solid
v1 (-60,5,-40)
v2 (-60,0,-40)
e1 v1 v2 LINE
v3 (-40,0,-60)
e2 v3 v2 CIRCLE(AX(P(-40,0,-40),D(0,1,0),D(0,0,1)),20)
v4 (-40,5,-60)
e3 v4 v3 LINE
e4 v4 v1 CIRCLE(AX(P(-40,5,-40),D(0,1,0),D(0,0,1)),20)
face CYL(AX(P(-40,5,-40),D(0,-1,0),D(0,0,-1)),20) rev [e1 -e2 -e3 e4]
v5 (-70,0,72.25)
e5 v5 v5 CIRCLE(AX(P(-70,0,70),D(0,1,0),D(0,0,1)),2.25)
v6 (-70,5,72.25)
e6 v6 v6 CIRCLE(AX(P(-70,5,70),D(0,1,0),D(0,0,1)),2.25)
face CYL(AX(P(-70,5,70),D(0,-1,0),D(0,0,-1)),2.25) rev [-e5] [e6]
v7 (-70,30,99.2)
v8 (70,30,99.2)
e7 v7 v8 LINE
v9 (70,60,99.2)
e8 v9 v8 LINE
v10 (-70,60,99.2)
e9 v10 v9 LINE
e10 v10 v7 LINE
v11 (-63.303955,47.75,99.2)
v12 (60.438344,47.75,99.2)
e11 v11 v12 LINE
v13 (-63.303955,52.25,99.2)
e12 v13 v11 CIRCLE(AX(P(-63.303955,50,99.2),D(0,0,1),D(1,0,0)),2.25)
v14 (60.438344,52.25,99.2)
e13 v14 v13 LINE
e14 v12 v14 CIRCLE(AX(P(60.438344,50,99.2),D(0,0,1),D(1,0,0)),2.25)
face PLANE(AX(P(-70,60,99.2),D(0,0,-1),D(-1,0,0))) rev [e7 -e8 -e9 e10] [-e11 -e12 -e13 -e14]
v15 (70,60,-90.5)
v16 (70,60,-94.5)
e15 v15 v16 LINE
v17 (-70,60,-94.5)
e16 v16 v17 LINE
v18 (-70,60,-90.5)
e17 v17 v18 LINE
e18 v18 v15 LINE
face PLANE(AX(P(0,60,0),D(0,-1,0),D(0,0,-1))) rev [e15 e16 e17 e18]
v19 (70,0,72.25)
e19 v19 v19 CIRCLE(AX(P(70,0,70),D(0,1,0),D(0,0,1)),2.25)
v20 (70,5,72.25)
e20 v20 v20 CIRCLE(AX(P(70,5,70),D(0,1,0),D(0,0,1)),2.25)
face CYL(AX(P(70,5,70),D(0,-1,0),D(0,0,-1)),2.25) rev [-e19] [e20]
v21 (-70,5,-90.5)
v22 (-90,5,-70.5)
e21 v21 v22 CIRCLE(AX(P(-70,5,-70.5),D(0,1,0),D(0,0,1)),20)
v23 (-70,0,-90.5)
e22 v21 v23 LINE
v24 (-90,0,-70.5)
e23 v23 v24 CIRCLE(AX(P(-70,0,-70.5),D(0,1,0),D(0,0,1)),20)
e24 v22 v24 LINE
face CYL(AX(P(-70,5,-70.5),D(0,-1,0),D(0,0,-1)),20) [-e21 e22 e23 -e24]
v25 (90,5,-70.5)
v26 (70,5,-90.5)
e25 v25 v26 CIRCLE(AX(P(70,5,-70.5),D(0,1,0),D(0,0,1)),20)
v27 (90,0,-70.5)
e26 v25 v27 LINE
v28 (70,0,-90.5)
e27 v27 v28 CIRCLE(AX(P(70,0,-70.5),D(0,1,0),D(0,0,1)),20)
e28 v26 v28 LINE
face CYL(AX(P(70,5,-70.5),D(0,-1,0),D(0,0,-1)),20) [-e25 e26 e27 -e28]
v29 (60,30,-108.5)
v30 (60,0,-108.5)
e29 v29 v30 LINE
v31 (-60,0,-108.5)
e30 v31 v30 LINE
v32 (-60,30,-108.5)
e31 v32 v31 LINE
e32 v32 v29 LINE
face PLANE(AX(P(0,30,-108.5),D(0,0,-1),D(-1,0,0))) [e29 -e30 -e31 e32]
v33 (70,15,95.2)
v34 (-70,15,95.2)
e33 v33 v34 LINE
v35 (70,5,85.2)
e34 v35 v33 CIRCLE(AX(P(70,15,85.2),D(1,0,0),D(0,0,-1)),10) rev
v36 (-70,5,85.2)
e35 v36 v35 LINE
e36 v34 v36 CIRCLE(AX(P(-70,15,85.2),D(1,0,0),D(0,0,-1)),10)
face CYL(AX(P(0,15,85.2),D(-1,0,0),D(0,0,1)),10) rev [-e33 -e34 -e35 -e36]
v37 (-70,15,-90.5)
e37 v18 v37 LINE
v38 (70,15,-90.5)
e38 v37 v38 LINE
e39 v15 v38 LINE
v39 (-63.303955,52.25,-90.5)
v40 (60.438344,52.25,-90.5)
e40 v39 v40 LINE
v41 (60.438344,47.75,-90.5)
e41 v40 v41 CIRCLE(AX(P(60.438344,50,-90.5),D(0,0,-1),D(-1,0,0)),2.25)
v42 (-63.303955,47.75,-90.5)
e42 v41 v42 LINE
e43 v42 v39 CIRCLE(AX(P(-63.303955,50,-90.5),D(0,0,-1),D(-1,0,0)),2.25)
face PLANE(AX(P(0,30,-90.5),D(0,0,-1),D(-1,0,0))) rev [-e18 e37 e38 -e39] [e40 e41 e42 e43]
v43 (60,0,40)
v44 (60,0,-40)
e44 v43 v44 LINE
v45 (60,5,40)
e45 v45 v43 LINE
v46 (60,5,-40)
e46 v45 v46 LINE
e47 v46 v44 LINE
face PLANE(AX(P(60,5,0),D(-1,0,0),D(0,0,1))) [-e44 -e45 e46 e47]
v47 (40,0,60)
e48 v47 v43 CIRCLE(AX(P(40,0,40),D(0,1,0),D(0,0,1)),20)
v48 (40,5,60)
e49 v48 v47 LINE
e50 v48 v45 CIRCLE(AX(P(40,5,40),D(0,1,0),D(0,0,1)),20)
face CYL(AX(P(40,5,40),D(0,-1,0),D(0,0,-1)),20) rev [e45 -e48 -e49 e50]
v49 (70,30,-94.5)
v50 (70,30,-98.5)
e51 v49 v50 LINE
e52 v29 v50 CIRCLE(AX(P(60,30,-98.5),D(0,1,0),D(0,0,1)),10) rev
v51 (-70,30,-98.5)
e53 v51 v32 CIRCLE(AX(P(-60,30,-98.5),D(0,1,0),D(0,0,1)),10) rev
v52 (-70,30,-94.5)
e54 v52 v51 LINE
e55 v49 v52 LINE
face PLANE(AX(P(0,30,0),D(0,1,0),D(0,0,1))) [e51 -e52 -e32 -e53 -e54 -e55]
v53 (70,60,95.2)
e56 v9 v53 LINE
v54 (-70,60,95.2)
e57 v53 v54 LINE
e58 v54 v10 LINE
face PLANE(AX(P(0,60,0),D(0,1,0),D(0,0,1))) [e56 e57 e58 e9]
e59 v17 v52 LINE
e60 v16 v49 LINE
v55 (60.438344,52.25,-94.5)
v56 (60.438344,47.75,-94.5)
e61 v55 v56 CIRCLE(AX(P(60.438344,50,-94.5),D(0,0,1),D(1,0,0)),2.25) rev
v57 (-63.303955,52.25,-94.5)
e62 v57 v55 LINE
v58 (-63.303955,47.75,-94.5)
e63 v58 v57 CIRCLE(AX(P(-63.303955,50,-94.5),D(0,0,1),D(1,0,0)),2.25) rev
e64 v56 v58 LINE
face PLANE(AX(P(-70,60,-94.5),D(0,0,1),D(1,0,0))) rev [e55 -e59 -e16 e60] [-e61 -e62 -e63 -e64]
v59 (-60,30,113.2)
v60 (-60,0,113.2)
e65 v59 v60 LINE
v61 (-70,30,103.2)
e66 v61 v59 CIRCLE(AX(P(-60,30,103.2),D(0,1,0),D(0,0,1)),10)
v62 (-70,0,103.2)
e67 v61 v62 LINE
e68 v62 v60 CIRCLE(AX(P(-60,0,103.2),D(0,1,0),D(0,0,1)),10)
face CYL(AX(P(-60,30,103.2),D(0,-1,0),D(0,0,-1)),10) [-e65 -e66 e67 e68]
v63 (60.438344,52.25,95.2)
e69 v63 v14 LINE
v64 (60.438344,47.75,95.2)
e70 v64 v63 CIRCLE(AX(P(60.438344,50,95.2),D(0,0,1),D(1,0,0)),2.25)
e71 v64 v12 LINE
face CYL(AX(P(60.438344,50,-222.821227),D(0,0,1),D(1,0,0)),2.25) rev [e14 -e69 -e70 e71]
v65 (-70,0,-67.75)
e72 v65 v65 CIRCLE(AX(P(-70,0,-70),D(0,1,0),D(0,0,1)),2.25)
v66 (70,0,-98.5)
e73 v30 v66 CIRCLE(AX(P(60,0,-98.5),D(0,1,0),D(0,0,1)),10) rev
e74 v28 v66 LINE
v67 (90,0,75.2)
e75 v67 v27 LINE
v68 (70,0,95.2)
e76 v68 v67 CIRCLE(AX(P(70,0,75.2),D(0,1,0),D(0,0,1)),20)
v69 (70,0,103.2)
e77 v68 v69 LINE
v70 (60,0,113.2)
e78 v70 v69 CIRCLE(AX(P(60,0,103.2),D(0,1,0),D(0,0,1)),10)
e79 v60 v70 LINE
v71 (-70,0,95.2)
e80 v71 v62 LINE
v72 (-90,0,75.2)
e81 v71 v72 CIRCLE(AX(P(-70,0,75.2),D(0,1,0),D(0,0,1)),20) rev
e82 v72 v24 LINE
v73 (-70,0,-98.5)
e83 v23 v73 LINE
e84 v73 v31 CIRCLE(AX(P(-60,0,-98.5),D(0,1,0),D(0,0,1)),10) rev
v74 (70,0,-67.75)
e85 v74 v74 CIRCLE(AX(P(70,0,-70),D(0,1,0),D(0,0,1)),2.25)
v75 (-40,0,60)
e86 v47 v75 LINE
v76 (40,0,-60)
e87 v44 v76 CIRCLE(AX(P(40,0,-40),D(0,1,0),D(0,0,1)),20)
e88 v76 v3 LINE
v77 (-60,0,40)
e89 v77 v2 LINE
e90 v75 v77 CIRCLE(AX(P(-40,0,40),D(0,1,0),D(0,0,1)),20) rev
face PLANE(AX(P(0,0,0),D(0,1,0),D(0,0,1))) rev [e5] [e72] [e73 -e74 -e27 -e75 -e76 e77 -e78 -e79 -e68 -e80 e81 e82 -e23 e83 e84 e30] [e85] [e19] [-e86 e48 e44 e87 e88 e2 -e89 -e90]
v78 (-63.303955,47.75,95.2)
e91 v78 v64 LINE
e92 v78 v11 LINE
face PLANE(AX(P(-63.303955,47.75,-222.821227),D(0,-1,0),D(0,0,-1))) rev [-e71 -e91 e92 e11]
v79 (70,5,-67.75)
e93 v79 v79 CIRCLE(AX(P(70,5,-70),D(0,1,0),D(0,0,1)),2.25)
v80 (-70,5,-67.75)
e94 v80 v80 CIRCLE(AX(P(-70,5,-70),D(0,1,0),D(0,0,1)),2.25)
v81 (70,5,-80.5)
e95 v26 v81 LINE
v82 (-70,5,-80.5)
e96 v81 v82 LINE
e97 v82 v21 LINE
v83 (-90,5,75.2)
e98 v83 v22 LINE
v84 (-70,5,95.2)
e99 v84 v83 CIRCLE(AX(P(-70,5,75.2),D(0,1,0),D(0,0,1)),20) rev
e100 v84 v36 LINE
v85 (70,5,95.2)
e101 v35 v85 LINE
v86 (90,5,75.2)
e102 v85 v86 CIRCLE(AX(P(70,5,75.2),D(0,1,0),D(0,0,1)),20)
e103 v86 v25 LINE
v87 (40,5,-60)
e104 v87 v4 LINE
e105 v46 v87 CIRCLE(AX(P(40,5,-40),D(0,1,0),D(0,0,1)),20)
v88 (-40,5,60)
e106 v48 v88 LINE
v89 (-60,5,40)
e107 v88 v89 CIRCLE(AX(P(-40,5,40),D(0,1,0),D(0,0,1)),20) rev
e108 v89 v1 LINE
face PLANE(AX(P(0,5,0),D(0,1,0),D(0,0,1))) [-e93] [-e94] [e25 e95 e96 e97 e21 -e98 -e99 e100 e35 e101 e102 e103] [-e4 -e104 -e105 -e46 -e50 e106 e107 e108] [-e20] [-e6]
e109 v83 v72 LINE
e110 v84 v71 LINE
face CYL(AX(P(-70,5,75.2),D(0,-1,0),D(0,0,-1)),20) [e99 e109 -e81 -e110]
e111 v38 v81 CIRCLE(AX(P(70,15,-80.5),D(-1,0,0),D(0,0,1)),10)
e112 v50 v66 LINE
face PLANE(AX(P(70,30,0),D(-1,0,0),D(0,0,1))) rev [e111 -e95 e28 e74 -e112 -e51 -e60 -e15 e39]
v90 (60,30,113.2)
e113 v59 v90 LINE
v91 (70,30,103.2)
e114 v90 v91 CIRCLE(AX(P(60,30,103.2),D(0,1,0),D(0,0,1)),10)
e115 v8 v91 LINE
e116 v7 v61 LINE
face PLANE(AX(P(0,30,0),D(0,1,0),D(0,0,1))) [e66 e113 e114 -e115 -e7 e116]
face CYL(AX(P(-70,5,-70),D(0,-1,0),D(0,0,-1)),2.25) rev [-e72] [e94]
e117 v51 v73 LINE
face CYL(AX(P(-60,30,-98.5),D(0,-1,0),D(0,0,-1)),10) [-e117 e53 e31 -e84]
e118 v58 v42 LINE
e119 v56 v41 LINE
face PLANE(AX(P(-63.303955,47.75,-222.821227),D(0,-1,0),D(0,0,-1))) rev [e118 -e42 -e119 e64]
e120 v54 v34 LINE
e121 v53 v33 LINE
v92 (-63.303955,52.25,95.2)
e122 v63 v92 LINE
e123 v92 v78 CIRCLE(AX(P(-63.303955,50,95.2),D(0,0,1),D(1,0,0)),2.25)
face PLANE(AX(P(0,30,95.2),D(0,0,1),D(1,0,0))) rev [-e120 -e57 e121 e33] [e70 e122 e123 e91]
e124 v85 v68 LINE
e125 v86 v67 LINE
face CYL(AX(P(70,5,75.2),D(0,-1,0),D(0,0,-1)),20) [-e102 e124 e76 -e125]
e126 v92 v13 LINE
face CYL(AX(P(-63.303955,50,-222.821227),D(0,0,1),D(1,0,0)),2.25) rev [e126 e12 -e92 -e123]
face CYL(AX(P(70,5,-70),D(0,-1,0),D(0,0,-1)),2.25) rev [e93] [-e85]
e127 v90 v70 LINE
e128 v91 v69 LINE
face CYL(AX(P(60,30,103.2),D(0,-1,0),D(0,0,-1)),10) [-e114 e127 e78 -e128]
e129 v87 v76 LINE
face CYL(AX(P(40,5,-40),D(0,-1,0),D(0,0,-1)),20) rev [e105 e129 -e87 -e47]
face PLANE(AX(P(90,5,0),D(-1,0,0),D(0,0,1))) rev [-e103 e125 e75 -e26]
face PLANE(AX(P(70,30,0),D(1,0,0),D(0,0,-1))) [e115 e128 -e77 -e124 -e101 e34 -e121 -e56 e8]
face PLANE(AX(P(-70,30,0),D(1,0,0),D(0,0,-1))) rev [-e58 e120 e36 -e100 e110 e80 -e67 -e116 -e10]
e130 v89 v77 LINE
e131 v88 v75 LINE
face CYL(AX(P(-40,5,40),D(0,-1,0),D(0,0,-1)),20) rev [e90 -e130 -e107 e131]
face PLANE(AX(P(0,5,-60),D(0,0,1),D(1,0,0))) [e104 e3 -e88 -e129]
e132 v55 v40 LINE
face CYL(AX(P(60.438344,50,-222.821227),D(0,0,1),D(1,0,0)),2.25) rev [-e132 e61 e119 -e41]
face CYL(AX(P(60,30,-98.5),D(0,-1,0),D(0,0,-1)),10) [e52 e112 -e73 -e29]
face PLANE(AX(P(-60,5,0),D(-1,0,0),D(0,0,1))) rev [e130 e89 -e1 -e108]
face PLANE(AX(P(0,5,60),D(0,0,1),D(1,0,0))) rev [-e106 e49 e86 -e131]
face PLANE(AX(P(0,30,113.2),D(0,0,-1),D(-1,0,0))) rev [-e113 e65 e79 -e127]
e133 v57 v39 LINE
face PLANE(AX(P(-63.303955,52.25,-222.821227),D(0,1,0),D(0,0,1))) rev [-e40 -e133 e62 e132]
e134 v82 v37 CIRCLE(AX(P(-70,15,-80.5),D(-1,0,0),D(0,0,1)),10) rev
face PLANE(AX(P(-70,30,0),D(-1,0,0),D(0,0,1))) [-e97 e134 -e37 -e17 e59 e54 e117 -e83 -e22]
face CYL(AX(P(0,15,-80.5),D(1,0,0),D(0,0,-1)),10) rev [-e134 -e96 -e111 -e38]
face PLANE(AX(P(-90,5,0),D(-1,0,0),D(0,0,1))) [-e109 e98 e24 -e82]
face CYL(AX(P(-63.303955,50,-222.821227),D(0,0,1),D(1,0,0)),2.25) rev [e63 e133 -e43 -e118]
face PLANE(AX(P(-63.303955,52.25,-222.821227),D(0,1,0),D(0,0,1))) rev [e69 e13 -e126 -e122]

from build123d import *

# Parameters (mm, degrees)
SKETCH1_R           = 2.25
BOSS_EXTRUDE2_DEPTH = 5
BOSS_EXTRUDE3_DEPTH = 30
SKETCH4_W           = 140
SKETCH4_H           = 4
BOSS_EXTRUDE4_DEPTH = 30
CUT_EXTRUDE1_REACH  = 236.178
FILLET1_R           = 10


with BuildPart() as part:
    # Sketch1 → Boss-Extrude2 (new body)
    with BuildSketch(Plane(origin=(0, 0, 0), x_dir=(1, 0, 0), z_dir=(0, 1, 0))):
        with BuildLine():
            Line((-70, 90.5), (70, 90.5))
            ThreePointArc((70, 90.5), (84.142135624, 84.642135624), (90, 70.5))
            Line((90, 70.5), (90, -75.2))
            ThreePointArc((90, -75.2), (84.142135624, -89.342135624), (70, -95.2))
            Line((70, -95.2), (-70, -95.2))
            ThreePointArc((-70, -95.2), (-84.142135624, -89.342135624), (-90, -75.2))
            Line((-90, -75.2), (-90, 70.5))
            ThreePointArc((-90, 70.5), (-84.142135624, 84.642135624), (-70, 90.5))
        make_face()
        with Locations(Location((-70, 70, 0), (0, 0, 270))):
            Circle(SKETCH1_R, mode=Mode.SUBTRACT)
        with Locations(Location((70, 70, 0), (0, 0, 270))):
            Circle(SKETCH1_R, mode=Mode.SUBTRACT)
        with Locations(Location((-70, -70, 0), (0, 0, 270))):
            Circle(SKETCH1_R, mode=Mode.SUBTRACT)
        with Locations(Location((70, -70, 0), (0, 0, 270))):
            Circle(SKETCH1_R, mode=Mode.SUBTRACT)
        with BuildLine():
            Line((40, -60), (-40, -60))
            ThreePointArc((-40, -60), (-54.142135624, -54.142135624), (-60, -40))
            Line((-60, -40), (-60, 40))
            ThreePointArc((-60, 40), (-54.142135624, 54.142135624), (-40, 60))
            Line((-40, 60), (40, 60))
            ThreePointArc((40, 60), (54.142135624, 54.142135624), (60, 40))
            Line((60, 40), (60, -40))
            ThreePointArc((60, -40), (54.142135624, -54.142135624), (40, -60))
        make_face(mode=Mode.SUBTRACT)
    extrude(amount=BOSS_EXTRUDE2_DEPTH)

    # Sketch1<3> → Boss-Extrude3 (add)
    with BuildSketch(Plane(origin=(0, 0, 0), x_dir=(1, 0, 0), z_dir=(0, 1, 0))):
        with BuildLine():
            Line((-70, -95.2), (-70, -103.2))
            ThreePointArc((-70, -103.2), (-67.071067812, -110.271067812), (-60, -113.2))
            Line((-60, -113.2), (60, -113.2))
            ThreePointArc((60, -113.2), (67.071067812, -110.271067812), (70, -103.2))
            Line((70, -103.2), (70, -95.2))
            Line((70, -95.2), (-70, -95.2))
        make_face()
        with BuildLine():
            ThreePointArc((-70, 98.5), (-67.071067812, 105.571067812), (-60, 108.5))
            Line((-60, 108.5), (60, 108.5))
            ThreePointArc((60, 108.5), (67.071067812, 105.571067812), (70, 98.5))
            Line((70, 98.5), (70, 90.5))
            Line((70, 90.5), (-70, 90.5))
            Line((-70, 90.5), (-70, 98.5))
        make_face()
    extrude(amount=BOSS_EXTRUDE3_DEPTH)

    # Sketch4 → Boss-Extrude4 (add)
    with BuildSketch(Plane(origin=(0, 30, 0), x_dir=(1, 0, 0), z_dir=(0, 1, 0))):
        with Locations((0, 92.5)):
            Rectangle(SKETCH4_W, SKETCH4_H)
        with Locations((0, -97.2)):
            Rectangle(SKETCH4_W, SKETCH4_H)
    extrude(amount=BOSS_EXTRUDE4_DEPTH)

    # Cut-Extrude1: up to this face of the body (flat: up to its plane)
    cut_extrude1_end = Plane(part.part.faces().sort_by_distance((0, 45, -94.5))[0])
    # Sketch5 → Cut-Extrude1 (cut, up to the picked face)
    with BuildSketch(Plane.XY.offset(99.2), mode=Mode.PRIVATE) as cut_extrude1_sk1:
        with BuildLine():
            Line((-63.303955024, 52.25), (60.438343891, 52.25))
            ThreePointArc((60.438343891, 52.25), (62.688343891, 50), (60.438343891, 47.75))
            Line((60.438343891, 47.75), (-63.303955024, 47.75))
            ThreePointArc((-63.303955024, 47.75), (-65.553955024, 50), (-63.303955024, 52.25))
        make_face()
    cut_extrude1_tool1 = split(extrude(cut_extrude1_sk1.sketch, amount=-CUT_EXTRUDE1_REACH, mode=Mode.PRIVATE), bisect_by=cut_extrude1_end, keep=Keep.BOTH, mode=Mode.PRIVATE)
    add(cut_extrude1_tool1.solids().sort_by(Axis((-1.432806, 50, 99.2), (0, 0, -1)))[0], mode=Mode.SUBTRACT)

    # Fillet1
    # the kernel refuses this fillet: 10 mm, written as the material it adds along each edge
    with BuildSketch(Plane(origin=(70, 5, 95.2), x_dir=(0, 0, -1), z_dir=(-1, 0, 0)), Plane(origin=(-70, 5, -90.5), x_dir=(0, 0, 1), z_dir=(1, 0, 0))) as fillet1_piece_1:
        with BuildLine():
            CenterArc((FILLET1_R, -FILLET1_R), FILLET1_R, 90, 90)
            Line((0, -FILLET1_R), (0, 0))
            Line((0, 0), (FILLET1_R, 0))
        make_face()
    extrude(amount=140)


solid = part.part
